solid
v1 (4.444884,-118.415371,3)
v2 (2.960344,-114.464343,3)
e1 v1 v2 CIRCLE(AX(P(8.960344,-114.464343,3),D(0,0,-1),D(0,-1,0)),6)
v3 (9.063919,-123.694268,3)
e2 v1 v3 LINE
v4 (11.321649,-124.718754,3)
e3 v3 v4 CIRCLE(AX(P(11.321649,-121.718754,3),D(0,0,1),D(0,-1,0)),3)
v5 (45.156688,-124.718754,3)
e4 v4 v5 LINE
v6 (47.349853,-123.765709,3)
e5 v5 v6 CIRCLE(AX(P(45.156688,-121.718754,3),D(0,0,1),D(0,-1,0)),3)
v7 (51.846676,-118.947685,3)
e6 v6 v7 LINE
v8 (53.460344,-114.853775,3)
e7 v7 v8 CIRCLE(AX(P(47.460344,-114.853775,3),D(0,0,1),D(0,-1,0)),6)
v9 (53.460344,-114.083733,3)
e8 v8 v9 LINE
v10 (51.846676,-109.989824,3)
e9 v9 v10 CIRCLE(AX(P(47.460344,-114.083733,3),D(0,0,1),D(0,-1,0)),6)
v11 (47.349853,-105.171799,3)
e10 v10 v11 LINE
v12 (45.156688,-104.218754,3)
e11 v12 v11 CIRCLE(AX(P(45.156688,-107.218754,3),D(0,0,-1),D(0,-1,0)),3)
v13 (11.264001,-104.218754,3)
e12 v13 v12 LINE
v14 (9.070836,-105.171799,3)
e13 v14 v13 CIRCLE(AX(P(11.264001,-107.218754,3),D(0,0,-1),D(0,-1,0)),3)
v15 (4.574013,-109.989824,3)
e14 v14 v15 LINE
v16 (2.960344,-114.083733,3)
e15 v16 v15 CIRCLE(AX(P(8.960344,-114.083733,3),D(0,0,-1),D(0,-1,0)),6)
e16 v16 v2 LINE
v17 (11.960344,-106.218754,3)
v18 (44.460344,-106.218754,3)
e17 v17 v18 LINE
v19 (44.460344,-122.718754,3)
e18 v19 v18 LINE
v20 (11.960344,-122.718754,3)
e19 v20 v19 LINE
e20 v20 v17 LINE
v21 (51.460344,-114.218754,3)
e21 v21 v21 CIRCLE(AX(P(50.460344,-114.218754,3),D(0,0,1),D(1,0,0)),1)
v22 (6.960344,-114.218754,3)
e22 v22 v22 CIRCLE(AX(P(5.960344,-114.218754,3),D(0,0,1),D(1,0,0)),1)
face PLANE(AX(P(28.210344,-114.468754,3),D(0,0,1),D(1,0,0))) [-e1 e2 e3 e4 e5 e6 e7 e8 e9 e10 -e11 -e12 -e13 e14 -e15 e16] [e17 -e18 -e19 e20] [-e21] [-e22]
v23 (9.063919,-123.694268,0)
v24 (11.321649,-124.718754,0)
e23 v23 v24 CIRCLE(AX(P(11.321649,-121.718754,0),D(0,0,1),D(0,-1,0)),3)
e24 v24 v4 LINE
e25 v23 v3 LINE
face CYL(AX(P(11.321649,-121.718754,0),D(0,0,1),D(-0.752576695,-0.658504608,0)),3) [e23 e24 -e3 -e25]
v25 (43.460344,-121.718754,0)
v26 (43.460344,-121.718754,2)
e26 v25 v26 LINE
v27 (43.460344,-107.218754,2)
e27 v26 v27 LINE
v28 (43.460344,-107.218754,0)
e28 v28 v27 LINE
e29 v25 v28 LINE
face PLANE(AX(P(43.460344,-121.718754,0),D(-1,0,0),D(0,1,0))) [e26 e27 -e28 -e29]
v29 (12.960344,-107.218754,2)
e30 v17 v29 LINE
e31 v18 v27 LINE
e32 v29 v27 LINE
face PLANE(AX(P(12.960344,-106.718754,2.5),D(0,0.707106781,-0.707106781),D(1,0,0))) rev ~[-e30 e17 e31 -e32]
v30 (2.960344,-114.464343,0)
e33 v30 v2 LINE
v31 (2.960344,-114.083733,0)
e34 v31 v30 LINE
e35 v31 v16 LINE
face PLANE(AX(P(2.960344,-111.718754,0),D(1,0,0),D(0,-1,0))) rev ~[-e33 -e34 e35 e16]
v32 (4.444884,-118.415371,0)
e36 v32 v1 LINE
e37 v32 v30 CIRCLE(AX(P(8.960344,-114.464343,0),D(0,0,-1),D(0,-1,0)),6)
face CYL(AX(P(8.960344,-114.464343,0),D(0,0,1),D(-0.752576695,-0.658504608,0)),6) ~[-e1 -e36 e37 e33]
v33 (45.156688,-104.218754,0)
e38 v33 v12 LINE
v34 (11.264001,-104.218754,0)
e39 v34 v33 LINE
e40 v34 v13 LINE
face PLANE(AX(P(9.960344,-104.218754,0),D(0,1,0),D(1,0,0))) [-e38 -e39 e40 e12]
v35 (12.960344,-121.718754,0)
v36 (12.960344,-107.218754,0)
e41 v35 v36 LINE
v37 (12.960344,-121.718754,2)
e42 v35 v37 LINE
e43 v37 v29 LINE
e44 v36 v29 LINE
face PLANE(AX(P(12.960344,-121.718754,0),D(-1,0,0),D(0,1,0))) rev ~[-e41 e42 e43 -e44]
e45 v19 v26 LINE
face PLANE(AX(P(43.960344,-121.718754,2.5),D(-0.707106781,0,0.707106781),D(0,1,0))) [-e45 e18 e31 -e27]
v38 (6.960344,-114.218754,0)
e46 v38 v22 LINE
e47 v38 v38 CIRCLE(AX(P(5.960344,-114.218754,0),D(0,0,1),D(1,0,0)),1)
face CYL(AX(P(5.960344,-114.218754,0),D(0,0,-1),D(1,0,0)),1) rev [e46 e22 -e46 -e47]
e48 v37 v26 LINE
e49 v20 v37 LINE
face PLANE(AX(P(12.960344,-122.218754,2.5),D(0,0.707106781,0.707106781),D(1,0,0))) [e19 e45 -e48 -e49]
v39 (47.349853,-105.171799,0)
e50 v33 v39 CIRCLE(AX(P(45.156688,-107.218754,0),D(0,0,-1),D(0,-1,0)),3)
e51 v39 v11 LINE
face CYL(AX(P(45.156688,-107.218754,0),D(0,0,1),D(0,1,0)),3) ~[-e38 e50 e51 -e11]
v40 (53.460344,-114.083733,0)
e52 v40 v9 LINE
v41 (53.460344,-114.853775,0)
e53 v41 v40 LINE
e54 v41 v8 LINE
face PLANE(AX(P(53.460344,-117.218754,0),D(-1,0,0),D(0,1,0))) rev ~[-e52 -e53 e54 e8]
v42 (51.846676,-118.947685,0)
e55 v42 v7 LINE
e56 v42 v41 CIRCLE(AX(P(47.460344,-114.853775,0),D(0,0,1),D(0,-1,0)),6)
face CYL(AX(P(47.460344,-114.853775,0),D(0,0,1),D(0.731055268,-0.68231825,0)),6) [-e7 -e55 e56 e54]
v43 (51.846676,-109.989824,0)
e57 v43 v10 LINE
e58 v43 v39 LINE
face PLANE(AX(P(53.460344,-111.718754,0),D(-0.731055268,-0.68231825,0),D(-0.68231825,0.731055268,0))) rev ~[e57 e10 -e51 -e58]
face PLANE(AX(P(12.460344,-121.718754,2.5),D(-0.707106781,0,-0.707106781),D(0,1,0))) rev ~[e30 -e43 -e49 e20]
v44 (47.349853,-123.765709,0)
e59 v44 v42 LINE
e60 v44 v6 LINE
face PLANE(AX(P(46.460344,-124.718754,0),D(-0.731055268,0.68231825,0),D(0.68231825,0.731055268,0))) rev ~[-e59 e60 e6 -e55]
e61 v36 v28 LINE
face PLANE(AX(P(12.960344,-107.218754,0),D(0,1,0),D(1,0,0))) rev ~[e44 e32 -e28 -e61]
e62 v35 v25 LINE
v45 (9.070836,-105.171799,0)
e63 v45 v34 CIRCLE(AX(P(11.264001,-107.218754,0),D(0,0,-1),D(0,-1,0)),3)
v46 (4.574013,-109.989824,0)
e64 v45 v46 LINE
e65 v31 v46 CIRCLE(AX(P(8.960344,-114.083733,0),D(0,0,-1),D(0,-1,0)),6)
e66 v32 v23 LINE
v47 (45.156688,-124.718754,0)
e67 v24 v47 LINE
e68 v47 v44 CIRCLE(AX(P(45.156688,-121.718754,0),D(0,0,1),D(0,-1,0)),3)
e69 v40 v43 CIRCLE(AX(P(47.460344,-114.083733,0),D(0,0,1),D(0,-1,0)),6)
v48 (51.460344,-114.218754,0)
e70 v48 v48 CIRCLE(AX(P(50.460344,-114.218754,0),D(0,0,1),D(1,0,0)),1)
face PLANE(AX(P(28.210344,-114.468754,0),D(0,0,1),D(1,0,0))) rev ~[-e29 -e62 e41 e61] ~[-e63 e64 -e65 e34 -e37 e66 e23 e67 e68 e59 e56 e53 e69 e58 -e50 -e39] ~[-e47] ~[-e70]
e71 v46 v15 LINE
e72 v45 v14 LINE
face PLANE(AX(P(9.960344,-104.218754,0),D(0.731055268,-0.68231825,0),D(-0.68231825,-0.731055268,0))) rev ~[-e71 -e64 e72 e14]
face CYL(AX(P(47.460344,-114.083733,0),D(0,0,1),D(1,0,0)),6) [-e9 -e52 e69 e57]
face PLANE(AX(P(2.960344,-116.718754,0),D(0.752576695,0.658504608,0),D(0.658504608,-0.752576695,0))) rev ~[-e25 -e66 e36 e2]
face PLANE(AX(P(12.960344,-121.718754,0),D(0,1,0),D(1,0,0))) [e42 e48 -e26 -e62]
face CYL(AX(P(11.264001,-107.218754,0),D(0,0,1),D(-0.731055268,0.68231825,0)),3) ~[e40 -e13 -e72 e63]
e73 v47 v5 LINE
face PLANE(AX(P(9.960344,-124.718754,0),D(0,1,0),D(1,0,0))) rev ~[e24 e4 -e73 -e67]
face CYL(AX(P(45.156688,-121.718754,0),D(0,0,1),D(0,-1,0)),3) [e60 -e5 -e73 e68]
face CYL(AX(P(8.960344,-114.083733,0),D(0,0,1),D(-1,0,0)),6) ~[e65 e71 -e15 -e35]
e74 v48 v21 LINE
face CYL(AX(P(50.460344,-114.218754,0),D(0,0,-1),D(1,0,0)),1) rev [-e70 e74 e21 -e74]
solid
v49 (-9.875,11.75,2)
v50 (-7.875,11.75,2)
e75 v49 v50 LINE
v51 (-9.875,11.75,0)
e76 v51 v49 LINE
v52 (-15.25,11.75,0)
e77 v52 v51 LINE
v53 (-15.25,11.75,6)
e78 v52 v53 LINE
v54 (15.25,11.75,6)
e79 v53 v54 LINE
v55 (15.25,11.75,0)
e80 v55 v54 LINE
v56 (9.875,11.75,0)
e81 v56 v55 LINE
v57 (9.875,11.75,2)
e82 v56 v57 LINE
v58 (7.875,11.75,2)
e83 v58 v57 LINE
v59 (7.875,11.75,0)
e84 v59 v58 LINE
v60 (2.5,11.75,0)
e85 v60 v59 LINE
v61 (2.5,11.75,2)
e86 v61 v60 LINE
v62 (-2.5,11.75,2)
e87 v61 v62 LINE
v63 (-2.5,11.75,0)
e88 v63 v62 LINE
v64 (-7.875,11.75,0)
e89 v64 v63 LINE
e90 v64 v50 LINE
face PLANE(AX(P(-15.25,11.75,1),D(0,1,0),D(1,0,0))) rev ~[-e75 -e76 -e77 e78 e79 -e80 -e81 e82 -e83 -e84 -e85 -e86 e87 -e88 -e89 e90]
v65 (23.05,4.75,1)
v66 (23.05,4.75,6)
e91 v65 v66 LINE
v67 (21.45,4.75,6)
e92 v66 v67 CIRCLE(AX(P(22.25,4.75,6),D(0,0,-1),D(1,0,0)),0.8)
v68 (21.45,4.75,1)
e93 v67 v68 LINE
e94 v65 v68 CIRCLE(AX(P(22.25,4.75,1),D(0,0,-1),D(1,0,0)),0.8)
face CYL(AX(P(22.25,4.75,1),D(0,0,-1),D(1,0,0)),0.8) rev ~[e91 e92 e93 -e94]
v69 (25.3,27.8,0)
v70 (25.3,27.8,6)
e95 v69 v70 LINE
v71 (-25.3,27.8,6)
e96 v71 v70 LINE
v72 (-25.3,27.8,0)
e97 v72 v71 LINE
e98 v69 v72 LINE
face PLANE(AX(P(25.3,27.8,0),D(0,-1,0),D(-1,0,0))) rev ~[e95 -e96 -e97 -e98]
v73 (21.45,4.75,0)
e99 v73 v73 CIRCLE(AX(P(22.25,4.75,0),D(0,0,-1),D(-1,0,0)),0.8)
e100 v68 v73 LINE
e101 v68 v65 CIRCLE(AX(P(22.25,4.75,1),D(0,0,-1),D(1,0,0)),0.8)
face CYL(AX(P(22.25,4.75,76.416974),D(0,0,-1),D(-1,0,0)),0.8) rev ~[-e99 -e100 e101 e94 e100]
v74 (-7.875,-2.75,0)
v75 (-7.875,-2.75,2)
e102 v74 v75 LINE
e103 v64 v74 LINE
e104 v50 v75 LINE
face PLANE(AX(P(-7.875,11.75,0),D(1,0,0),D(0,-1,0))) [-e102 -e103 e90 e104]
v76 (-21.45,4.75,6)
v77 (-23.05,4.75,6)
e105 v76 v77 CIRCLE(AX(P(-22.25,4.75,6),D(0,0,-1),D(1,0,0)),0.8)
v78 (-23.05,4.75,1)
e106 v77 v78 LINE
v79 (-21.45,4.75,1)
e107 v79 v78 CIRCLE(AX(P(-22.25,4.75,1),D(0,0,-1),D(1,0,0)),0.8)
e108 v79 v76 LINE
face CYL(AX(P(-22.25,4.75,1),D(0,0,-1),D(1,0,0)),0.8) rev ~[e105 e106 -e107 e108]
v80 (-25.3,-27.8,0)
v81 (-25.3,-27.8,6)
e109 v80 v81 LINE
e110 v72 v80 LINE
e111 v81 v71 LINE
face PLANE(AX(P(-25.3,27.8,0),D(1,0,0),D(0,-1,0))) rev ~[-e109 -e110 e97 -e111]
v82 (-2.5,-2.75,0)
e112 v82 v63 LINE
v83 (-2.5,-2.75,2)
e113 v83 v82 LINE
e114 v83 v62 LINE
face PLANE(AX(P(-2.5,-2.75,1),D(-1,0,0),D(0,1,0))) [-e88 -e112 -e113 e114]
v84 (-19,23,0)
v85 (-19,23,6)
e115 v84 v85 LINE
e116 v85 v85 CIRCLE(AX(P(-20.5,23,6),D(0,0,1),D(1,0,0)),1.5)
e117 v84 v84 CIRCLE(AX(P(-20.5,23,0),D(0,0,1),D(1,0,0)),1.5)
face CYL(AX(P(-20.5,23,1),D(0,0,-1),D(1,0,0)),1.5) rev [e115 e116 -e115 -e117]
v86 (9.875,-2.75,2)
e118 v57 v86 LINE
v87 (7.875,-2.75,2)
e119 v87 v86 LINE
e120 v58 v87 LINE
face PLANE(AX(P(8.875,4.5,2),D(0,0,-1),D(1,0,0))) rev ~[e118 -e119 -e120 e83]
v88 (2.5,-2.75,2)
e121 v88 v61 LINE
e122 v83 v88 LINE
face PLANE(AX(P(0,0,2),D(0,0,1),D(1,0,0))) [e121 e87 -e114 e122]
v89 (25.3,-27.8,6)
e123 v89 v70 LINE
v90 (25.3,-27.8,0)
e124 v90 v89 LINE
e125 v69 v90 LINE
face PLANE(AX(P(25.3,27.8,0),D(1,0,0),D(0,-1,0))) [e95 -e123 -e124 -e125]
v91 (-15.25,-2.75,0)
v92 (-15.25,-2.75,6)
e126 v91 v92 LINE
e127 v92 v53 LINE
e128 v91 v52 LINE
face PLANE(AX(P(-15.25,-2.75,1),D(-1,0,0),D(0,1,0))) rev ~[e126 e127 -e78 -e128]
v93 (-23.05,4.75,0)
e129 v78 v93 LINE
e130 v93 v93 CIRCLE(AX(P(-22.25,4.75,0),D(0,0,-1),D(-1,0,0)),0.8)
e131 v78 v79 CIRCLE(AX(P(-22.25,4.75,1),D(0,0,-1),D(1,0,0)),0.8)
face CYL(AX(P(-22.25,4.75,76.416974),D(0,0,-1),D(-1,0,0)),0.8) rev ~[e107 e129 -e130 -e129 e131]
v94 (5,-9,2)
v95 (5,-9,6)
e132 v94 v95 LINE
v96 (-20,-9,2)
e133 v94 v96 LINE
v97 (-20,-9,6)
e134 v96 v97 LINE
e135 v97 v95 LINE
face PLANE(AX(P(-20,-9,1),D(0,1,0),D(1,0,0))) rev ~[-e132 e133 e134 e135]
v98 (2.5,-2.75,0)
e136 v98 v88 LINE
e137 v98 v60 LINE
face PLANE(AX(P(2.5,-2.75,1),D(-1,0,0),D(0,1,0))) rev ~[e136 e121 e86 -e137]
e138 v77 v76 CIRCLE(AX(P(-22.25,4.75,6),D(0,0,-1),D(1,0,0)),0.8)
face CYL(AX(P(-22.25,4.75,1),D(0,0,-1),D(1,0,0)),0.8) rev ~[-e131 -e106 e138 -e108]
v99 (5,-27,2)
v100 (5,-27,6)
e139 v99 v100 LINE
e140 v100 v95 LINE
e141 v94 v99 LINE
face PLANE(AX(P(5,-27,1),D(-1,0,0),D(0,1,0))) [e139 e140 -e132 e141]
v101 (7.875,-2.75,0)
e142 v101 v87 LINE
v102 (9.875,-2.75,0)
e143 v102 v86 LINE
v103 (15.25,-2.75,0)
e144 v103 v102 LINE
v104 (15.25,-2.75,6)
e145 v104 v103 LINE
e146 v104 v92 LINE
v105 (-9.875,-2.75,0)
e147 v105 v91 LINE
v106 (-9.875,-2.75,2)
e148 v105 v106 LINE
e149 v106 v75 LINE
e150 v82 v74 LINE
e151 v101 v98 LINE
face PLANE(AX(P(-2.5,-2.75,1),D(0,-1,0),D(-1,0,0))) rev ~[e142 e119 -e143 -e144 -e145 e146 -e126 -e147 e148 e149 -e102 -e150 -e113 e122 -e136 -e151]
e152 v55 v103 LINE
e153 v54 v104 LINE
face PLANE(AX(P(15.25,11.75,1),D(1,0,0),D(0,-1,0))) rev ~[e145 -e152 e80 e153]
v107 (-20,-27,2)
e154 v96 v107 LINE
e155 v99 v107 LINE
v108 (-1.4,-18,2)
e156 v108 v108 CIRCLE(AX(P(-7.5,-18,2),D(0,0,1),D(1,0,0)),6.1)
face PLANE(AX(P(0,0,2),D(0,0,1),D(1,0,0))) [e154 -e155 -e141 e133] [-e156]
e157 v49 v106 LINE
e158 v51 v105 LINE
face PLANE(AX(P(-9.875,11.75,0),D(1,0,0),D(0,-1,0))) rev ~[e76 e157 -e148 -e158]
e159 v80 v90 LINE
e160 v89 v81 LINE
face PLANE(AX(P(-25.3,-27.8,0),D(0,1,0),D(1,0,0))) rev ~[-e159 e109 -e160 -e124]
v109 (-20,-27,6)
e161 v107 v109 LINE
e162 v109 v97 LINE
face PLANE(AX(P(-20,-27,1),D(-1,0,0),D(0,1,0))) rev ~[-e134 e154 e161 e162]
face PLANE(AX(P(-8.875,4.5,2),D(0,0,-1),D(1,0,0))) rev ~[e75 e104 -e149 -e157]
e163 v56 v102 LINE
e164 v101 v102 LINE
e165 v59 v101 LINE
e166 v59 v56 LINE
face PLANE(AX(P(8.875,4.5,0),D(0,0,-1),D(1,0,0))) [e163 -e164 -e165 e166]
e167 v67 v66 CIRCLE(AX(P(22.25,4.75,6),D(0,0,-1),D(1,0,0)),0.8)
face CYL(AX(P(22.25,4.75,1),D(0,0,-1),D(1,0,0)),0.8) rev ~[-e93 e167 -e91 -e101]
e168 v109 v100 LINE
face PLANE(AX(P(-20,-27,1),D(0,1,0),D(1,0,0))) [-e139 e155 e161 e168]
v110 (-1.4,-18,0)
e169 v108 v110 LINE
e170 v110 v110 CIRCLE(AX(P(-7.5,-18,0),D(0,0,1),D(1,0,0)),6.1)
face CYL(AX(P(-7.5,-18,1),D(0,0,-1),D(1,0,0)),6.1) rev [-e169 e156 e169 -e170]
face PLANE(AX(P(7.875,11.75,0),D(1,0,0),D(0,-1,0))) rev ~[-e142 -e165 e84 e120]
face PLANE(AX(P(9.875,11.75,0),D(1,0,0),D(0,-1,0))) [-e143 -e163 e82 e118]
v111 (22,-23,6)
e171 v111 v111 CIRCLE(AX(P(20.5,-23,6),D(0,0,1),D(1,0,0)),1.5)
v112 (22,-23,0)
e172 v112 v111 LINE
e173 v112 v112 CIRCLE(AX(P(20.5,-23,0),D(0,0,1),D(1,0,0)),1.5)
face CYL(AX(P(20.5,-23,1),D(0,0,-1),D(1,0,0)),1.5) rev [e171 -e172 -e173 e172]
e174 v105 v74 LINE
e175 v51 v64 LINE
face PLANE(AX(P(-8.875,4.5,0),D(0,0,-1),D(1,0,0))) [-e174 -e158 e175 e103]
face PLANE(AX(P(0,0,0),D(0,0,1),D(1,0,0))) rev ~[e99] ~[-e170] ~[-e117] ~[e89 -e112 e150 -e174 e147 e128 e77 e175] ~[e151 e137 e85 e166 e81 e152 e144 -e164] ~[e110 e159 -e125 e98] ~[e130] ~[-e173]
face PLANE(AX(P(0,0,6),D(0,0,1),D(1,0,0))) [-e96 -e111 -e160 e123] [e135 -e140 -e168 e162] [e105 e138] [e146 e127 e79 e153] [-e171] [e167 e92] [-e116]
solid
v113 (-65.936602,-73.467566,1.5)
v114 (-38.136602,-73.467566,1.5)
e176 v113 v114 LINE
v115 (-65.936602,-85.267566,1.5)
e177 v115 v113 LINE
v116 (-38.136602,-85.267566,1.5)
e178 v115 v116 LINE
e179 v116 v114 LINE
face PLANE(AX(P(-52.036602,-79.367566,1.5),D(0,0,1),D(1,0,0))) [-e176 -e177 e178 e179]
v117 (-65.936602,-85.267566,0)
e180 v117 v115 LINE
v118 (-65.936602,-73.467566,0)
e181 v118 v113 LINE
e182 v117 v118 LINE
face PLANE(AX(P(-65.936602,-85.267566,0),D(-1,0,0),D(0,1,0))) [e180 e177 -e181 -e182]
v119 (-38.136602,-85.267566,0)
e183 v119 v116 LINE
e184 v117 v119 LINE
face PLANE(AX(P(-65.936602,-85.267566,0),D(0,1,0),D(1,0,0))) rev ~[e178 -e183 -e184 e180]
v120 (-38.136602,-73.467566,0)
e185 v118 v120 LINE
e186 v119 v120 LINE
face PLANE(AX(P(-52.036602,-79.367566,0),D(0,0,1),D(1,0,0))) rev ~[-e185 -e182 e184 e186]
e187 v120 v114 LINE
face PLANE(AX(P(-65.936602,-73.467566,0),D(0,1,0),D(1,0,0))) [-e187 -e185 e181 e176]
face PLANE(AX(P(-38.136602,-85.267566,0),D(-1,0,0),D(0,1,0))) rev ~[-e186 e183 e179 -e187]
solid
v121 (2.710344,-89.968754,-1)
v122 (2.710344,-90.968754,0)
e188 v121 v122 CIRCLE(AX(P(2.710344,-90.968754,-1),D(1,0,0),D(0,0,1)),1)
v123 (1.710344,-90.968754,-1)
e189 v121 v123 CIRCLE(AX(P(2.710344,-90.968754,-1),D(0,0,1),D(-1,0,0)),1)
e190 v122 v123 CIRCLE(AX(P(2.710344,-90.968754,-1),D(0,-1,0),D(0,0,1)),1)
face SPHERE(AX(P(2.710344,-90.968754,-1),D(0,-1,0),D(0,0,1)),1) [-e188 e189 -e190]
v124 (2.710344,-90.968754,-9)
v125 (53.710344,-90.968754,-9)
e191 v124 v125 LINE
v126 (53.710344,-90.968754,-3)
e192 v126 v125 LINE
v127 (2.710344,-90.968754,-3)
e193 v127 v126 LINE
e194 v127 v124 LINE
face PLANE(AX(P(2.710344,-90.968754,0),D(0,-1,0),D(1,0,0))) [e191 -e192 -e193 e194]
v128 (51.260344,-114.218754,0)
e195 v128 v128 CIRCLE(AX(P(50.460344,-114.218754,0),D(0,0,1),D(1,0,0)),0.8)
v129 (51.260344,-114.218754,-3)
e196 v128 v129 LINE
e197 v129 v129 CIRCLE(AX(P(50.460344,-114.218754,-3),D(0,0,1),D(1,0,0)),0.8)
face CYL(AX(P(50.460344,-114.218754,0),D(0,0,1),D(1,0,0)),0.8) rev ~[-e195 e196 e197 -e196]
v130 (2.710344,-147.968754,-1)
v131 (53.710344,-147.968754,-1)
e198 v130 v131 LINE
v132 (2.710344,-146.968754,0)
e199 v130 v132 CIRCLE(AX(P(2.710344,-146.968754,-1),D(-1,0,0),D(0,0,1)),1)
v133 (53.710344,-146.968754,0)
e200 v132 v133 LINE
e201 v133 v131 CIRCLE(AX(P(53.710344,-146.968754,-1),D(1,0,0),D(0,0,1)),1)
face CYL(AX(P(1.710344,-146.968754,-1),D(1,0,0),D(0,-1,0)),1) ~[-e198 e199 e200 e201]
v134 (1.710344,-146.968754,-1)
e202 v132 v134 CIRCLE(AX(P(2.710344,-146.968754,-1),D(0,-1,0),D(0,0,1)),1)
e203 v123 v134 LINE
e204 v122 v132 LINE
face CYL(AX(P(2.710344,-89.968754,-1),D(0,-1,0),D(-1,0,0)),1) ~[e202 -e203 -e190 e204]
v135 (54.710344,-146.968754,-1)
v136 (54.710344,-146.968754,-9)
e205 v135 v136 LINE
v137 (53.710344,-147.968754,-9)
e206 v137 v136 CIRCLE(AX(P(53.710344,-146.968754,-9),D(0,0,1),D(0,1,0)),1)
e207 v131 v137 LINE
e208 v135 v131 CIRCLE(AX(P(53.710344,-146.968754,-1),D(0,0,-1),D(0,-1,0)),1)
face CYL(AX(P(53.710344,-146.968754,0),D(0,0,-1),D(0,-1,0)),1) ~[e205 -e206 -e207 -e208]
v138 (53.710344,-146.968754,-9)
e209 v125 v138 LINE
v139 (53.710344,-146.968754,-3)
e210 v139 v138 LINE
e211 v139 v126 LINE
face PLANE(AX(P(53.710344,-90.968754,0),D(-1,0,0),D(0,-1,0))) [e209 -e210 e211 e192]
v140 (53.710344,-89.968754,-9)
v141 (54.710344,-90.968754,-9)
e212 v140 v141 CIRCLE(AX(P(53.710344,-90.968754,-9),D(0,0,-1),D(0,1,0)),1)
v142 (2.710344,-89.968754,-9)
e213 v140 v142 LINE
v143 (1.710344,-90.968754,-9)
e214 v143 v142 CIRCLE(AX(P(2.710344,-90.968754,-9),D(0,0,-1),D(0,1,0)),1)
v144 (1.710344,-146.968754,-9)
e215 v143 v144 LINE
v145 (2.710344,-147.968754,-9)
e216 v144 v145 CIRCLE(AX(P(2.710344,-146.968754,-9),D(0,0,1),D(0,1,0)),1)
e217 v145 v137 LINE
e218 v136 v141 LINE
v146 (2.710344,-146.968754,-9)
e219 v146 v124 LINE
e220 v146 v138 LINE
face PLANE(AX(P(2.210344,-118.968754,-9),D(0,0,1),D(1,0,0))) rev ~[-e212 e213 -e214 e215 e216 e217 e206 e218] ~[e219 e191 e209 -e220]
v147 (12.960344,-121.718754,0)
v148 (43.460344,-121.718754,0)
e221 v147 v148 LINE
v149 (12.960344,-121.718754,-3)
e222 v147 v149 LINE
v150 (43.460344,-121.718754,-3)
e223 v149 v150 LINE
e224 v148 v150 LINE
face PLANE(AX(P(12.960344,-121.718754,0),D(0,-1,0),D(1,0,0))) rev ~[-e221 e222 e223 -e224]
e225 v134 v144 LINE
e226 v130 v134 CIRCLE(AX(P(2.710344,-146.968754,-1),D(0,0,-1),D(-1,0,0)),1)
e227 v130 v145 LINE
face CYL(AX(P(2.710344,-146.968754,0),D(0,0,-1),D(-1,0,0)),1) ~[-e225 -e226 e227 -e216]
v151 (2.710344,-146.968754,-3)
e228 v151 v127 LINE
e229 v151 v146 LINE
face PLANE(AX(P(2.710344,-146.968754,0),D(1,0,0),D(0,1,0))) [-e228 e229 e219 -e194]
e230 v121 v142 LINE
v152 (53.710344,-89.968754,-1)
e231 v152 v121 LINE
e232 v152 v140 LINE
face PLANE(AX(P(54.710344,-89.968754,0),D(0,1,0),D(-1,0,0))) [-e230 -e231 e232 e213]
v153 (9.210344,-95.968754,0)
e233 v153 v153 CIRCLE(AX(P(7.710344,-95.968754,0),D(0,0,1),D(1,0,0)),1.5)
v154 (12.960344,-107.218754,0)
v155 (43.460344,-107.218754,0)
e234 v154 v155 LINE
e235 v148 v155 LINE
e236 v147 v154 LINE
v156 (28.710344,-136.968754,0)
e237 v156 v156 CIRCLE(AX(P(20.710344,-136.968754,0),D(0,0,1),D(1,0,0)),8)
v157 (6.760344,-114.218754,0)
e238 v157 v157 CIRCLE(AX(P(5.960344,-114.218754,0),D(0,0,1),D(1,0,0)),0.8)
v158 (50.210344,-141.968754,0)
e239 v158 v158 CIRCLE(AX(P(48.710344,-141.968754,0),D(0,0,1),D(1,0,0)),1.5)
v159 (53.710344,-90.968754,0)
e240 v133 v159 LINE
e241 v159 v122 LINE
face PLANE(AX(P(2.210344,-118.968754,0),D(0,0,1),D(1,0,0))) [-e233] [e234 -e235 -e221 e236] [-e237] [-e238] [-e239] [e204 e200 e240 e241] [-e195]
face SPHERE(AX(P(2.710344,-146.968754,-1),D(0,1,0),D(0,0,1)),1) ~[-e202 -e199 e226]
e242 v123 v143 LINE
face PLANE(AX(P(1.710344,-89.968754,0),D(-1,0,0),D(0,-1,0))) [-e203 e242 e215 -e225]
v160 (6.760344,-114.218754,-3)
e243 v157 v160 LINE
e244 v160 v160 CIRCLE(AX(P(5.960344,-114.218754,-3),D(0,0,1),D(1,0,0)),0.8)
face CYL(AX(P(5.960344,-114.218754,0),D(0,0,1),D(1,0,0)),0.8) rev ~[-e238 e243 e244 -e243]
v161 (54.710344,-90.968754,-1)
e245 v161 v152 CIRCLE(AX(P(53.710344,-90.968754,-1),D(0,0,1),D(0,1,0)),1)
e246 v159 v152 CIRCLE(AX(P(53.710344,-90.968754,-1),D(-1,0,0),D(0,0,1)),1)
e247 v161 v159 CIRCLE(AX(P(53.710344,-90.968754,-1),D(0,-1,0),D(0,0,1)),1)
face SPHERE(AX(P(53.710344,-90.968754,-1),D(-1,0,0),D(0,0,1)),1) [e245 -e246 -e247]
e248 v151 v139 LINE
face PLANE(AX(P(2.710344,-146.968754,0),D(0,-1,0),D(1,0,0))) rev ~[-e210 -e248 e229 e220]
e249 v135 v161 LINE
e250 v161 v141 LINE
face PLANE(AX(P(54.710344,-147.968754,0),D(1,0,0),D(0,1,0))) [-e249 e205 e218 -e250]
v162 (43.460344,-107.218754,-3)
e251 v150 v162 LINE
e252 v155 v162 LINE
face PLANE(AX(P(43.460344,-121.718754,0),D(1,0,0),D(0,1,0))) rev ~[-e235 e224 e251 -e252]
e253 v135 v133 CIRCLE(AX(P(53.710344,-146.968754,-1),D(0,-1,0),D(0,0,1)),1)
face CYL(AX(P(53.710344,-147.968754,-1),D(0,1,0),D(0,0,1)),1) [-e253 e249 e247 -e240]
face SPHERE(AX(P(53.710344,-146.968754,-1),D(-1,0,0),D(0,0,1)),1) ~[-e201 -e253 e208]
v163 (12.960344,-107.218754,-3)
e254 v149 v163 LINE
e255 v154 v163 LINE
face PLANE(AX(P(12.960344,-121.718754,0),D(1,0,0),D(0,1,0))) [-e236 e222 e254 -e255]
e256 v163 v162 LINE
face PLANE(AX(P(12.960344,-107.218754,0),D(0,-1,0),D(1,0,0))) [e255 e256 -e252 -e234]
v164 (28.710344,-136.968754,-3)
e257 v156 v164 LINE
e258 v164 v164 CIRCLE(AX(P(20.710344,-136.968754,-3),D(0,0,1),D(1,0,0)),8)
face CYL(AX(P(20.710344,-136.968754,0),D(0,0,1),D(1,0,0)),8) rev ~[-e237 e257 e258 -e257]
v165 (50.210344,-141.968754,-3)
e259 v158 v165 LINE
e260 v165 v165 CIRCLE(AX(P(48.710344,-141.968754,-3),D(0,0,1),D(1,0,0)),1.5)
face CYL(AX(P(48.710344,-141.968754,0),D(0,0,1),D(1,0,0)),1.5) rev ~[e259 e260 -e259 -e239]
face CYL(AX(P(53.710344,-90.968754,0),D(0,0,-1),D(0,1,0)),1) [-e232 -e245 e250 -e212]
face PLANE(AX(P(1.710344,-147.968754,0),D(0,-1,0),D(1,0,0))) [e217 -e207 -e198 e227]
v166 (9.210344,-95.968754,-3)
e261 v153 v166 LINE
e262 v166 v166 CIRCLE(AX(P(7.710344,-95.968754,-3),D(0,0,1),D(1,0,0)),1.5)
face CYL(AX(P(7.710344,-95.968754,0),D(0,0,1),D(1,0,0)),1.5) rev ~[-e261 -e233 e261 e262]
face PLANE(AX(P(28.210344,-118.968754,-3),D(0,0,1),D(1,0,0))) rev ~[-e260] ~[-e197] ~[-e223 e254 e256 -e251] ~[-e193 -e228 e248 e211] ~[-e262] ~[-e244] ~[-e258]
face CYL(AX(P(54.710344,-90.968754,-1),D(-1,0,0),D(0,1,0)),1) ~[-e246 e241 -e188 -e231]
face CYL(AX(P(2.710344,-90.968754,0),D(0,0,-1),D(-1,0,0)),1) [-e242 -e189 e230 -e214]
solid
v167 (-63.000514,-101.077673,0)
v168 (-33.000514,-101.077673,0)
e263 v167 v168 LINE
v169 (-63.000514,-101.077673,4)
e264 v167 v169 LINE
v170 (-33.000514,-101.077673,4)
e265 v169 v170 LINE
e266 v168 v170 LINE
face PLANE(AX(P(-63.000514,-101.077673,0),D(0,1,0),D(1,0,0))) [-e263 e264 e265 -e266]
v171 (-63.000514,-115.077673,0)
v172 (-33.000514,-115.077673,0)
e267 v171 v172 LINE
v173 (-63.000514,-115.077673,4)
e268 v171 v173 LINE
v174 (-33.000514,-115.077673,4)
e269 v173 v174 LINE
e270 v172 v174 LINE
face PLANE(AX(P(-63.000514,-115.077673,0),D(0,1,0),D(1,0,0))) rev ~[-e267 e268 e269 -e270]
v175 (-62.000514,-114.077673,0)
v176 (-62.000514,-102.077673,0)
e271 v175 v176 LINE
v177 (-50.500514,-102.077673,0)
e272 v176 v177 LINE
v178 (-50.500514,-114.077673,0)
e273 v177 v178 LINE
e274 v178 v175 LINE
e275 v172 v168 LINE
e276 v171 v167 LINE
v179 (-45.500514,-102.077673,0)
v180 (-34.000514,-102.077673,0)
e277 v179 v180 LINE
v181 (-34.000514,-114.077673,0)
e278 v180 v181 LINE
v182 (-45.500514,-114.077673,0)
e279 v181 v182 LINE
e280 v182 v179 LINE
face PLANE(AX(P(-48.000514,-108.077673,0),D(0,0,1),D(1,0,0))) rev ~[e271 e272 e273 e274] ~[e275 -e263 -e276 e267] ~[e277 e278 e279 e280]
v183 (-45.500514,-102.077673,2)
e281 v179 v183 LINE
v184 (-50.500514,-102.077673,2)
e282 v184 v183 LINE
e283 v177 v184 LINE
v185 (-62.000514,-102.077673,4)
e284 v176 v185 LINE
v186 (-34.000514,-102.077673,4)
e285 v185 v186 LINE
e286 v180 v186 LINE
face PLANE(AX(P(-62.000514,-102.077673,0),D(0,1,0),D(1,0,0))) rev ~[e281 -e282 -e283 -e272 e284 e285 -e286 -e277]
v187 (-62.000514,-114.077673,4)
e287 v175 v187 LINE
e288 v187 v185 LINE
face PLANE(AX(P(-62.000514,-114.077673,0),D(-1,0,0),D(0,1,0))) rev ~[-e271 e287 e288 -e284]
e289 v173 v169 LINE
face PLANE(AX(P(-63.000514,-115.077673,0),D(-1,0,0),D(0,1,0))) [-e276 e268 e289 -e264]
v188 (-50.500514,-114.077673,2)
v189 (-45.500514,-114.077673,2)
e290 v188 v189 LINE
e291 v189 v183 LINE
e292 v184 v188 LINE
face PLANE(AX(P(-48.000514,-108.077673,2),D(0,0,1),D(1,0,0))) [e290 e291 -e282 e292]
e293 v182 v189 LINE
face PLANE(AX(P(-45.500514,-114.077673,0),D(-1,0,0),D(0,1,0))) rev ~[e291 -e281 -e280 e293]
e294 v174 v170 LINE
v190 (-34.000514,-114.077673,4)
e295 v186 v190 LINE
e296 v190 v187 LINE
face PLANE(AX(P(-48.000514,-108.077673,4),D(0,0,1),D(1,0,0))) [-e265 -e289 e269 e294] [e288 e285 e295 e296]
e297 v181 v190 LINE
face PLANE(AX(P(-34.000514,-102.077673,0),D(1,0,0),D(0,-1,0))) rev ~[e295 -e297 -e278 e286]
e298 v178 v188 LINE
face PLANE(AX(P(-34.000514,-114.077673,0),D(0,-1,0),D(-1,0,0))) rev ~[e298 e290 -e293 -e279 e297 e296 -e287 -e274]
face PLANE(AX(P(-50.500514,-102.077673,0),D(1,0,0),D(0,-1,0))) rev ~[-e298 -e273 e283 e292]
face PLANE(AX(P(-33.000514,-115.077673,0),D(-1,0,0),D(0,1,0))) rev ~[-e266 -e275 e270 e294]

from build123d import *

# Parameters (mm, degrees)
F0_W      = 51
F0_H      = 56
F0_R      = 6.1
F0_R_2    = 1.5
F0_W_2    = 5
F0_H_2    = 14.5
F1_DEPTH  = 1
F2_W      = 30
F2_H      = 14
F5_DEPTH  = 4
F2_W_2    = 51
F2_H_2    = 56
F2_R      = 8
F2_R_2    = 1.5
F2_R_3    = 0.8
F2_W_3    = 30.5
F2_H_3    = 14.5
F6_DEPTH  = 3
F2_W_4    = 5
F2_H_4    = 2
F2_H_5    = 5
F7_DEPTH  = 2
F3_W      = 27.8
F3_H      = 11.8
F8_DEPTH  = 1.5
F2_H_6    = 1
F9_DEPTH  = 9
F10_W     = 36.5
F10_H     = 20.5
F10_W_2   = 30.5
F10_H_2   = 14.5
F10_R     = 1
F11_DEPTH = 3
F12_R     = 6
F13_R     = 3
F14_R     = 1
F15_SIZE  = 1
F18_DEPTH = 1
F19_D     = 1.4
F19_DEPTH = 1.001
F21_D     = 1.4
F16_W     = 51
F16_H     = 56
F16_W_2   = 25
F16_H_2   = 18
F16_R     = 1.5
F22_DEPTH = 5
F23_W     = 0.2
F23_H     = 55.6
F24_DEPTH = 25
F25_D     = 1.6
F25_DEPTH = 5.001
F26_D     = 1.6
F27_W     = 2
F27_H     = 14.5
F28_DEPTH = 2


# Not quite as in the source:
# - a feature names something its author has since deleted; it is built from what else it names


with BuildPart() as f1:
    # F0 (on Top) → F1 (new body)
    with BuildSketch(Plane.XY):
        Rectangle(F0_W, F0_H)
        with Locations((-7.5, -18)):
            Circle(F0_R, mode=Mode.SUBTRACT)
        with Locations((20.5, -23)):
            Circle(F0_R_2, mode=Mode.SUBTRACT)
        with Locations((-20.5, 23)):
            Circle(F0_R_2, mode=Mode.SUBTRACT)
        Polygon((-15.25, -2.75), (-15.25, 11.75), (-2.5, 11.75), (2.5, 11.75), (15.25, 11.75), (15.25, -2.75), (2.5, -2.75), (-2.5, -2.75), align=None, mode=Mode.SUBTRACT)
        with Locations((0, 4.5)):
            Rectangle(F0_W_2, F0_H_2)
    extrude(amount=F1_DEPTH)

    # F18 (add): a face of the model
    f18_faces = [f1.faces().sort_by_distance(p)[0] for p in [
        (0.3722548806, 0.1869472989, 1),
    ]]
    extrude(f18_faces, amount=F18_DEPTH)

    # F19 (through all, one way)
    with BuildSketch(Plane.XY.offset(1)):
        with Locations((-22.25, 4.75), (22.25, 4.75)):
            Circle(F19_D / 2)
    extrude(amount=-F19_DEPTH, mode=Mode.SUBTRACT)

    # F21 (through all)
    with Locations(Plane(origin=(0, 0, 1), x_dir=(1, 0, 0), z_dir=(0, 0, -1))):
        with Locations((-22.25, -4.75), (22.25, -4.75)):
            Hole(F21_D / 2)

    # F16 (on face) → F22 (join)
    with BuildSketch(Plane.XY.offset(1)):
        Rectangle(F16_W, F16_H)
        with Locations((-7.5, -18)):
            Rectangle(F16_W_2, F16_H_2, mode=Mode.SUBTRACT)
        with Locations((20.5, -23)):
            Circle(F16_R, mode=Mode.SUBTRACT)
        with Locations((-20.5, 23)):
            Circle(F16_R, mode=Mode.SUBTRACT)
        Polygon((-15.25, -2.75), (-15.25, 11.75), (-2.5, 11.75), (2.5, 11.75), (15.25, 11.75), (15.25, -2.75), (2.5, -2.75), (-2.5, -2.75), align=None, mode=Mode.SUBTRACT)
    extrude(amount=F22_DEPTH)

    # F23 (on face) → F24 (cut)
    with BuildSketch(Plane(origin=(0, 0, 0), x_dir=(1, 0, 0), z_dir=(0, 0, -1))):
        Polygon((25.5, 28), (-25.5, 28), (-25.5, 27.8), (-25.3, 27.8), (25.3, 27.8), (25.5, 27.8), align=None)
        with Locations((-25.4, 0)):
            Rectangle(F23_W, F23_H)
        with Locations((25.4, 0)):
            Rectangle(F23_W, F23_H)
        Polygon((-25.3, -27.8), (-25.5, -27.8), (-25.5, -28), (25.5, -28), (25.5, -27.8), (25.3, -27.8), align=None)
    extrude(amount=-F24_DEPTH, mode=Mode.SUBTRACT)

    # F25 (through all, one way)
    with BuildSketch(Plane(origin=(0, 0, 1), x_dir=(1, 0, 0), z_dir=(0, 0, -1))):
        with Locations((-22.25, -4.75), (22.25, -4.75)):
            Circle(F25_D / 2)
    extrude(amount=-F25_DEPTH, mode=Mode.SUBTRACT)

    # F26 (through all)
    with Locations(Plane.XY.offset(1)):
        with Locations((22.25, 4.75), (-22.25, 4.75)):
            Hole(F26_D / 2)

    # F27 (on face) → F28 (join)
    with BuildSketch(Plane(origin=(0, 0, 0), x_dir=(1, 0, 0), z_dir=(0, 0, -1))):
        with Locations((-8.875, -4.5)):
            Rectangle(F27_W, F27_H)
        with Locations((8.875, -4.5)):
            Rectangle(F27_W, F27_H)
    extrude(amount=-F28_DEPTH)


with BuildPart() as f5:
    # F2 (on Top) → F5 (new body)
    with BuildSketch(Plane.XY):
        with Locations((-48.0005137329, -108.0776734079)):
            Rectangle(F2_W, F2_H)
        Polygon((-62.0005137329, -114.0776734079), (-62.0005137329, -102.0776734079), (-50.5005137329, -102.0776734079), (-45.5005137329, -102.0776734079), (-34.0005137329, -102.0776734079), (-34.0005137329, -107.0776734079), (-34.0005137329, -109.0776734079), (-34.0005137329, -114.0776734079), (-45.5005137329, -114.0776734079), (-50.5005137329, -114.0776734079), align=None, mode=Mode.SUBTRACT)
    extrude(amount=F5_DEPTH)

    # F2 (on Top) → F7 (join)
    with BuildSketch(Plane.XY):
        with Locations((-48.0005137329, -108.0776734079)):
            Rectangle(F2_W_4, F2_H_4)
        with Locations((-48.0005137329, -104.5776734079)):
            Rectangle(F2_W_4, F2_H_5)
        with Locations((-48.0005137329, -111.5776734079)):
            Rectangle(F2_W_4, F2_H_5)
    extrude(amount=F7_DEPTH)


with BuildPart() as f6:
    # F2 (on Top) → F6 (new body)
    with BuildSketch(Plane.XY):
        with Locations((28.2103444552, -118.9687541723)):
            Rectangle(F2_W_2, F2_H_2)
        with Locations((20.7103444552, -136.9687541723)):
            Circle(F2_R, mode=Mode.SUBTRACT)
        with Locations((48.7103444552, -141.9687541723)):
            Circle(F2_R_2, mode=Mode.SUBTRACT)
        with Locations((5.9603444552, -114.2187541723)):
            Circle(F2_R_3, mode=Mode.SUBTRACT)
        with Locations((28.2103444552, -114.4687541723)):
            Rectangle(F2_W_3, F2_H_3, mode=Mode.SUBTRACT)
        with Locations((50.4603444552, -114.2187541723)):
            Circle(F2_R_3, mode=Mode.SUBTRACT)
        with Locations((7.7103444552, -95.9687541723)):
            Circle(F2_R_2, mode=Mode.SUBTRACT)
    extrude(amount=-F6_DEPTH)

    # F2 (on Top) → F9 (join)
    with BuildSketch(Plane.XY):
        Polygon((2.7103444552, -146.9687541723), (2.7103444552, -90.9687541723), (2.7103444552, -89.9687541723), (1.7103444552, -89.9687541723), (1.7103444552, -147.9687541723), (2.7103444552, -147.9687541723), align=None)
        with Locations((28.2103444552, -90.4687541723)):
            Rectangle(F2_W_2, F2_H_6)
        with Locations((28.2103444552, -147.4687541723)):
            Rectangle(F2_W_2, F2_H_6)
        Polygon((53.7103444552, -89.9687541723), (53.7103444552, -90.9687541723), (53.7103444552, -146.9687541723), (53.7103444552, -147.9687541723), (54.7103444552, -147.9687541723), (54.7103444552, -89.9687541723), align=None)
    extrude(amount=-F9_DEPTH)

    # F14
    f14_edges = [f6.edges().sort_by_distance(p)[0] for p in [
        (1.710344, -118.968754, 0),
        (28.210344, -89.968754, 0),
        (28.210344, -147.968754, 0),
        (54.710344, -118.968754, 0),
        (54.710344, -147.968754, -4.5),
        (1.710344, -147.968754, -4.5),
        (1.710344, -89.968754, -4.5),
        (54.710344, -89.968754, -4.5),
    ]]
    fillet(f14_edges, radius=F14_R)


with BuildPart() as f8:
    # F3 (on Top) → F8 (new body)
    with BuildSketch(Plane.XY):
        with Locations((-52.0366017878, -79.3675661445)):
            Rectangle(F3_W, F3_H)
    extrude(amount=F8_DEPTH)


with BuildPart() as f11:
    # F10 (on face) → F11 (new body)
    with BuildSketch(Plane.XY):
        with Locations((28.2103444552, -114.4687541723)):
            Rectangle(F10_W, F10_H)
        with Locations((28.2103444552, -114.4687541723)):
            Rectangle(F10_W_2, F10_H_2, mode=Mode.SUBTRACT)
        Polygon((9.9603444552, -124.7187541723), (9.9603444552, -104.2187541723), (2.9603444552, -111.7187541723), (2.9603444552, -116.7187541723), align=None)
        with Locations((5.9603444552, -114.2187541723)):
            Circle(F10_R, mode=Mode.SUBTRACT)
        Polygon((53.4603444552, -111.7187541723), (46.4603444552, -104.2187541723), (46.4603444552, -124.7187541723), (53.4603444552, -117.2187541723), align=None)
        with Locations((50.4603444552, -114.2187541723)):
            Circle(F10_R, mode=Mode.SUBTRACT)
    extrude(amount=F11_DEPTH)

    # F12
    f12_edges = [f11.edges().sort_by_distance(p)[0] for p in [
        (2.960344, -111.718754, 1.5),
        (2.960344, -116.718754, 1.5),
        (53.460344, -117.218754, 1.5),
        (53.460344, -111.718754, 1.5),
    ]]
    fillet(f12_edges, radius=F12_R)

    # F13
    f13_edges = [f11.edges().sort_by_distance(p)[0] for p in [
        (9.960344, -104.218754, 1.5),
        (9.960344, -124.718754, 1.5),
        (46.460344, -124.718754, 1.5),
        (46.460344, -104.218754, 1.5),
    ]]
    fillet(f13_edges, radius=F13_R)

    # F15
    f15_edges = [f11.edges().sort_by_distance(p)[0] for p in [
        (12.960344, -114.468754, 3),
        (28.210344, -107.218754, 3),
        (43.460344, -114.468754, 3),
        (28.210344, -121.718754, 3),
    ]]
    chamfer(f15_edges, length=F15_SIZE)


solid = Compound([f1.part, f5.part, f6.part, f8.part, f11.part])
